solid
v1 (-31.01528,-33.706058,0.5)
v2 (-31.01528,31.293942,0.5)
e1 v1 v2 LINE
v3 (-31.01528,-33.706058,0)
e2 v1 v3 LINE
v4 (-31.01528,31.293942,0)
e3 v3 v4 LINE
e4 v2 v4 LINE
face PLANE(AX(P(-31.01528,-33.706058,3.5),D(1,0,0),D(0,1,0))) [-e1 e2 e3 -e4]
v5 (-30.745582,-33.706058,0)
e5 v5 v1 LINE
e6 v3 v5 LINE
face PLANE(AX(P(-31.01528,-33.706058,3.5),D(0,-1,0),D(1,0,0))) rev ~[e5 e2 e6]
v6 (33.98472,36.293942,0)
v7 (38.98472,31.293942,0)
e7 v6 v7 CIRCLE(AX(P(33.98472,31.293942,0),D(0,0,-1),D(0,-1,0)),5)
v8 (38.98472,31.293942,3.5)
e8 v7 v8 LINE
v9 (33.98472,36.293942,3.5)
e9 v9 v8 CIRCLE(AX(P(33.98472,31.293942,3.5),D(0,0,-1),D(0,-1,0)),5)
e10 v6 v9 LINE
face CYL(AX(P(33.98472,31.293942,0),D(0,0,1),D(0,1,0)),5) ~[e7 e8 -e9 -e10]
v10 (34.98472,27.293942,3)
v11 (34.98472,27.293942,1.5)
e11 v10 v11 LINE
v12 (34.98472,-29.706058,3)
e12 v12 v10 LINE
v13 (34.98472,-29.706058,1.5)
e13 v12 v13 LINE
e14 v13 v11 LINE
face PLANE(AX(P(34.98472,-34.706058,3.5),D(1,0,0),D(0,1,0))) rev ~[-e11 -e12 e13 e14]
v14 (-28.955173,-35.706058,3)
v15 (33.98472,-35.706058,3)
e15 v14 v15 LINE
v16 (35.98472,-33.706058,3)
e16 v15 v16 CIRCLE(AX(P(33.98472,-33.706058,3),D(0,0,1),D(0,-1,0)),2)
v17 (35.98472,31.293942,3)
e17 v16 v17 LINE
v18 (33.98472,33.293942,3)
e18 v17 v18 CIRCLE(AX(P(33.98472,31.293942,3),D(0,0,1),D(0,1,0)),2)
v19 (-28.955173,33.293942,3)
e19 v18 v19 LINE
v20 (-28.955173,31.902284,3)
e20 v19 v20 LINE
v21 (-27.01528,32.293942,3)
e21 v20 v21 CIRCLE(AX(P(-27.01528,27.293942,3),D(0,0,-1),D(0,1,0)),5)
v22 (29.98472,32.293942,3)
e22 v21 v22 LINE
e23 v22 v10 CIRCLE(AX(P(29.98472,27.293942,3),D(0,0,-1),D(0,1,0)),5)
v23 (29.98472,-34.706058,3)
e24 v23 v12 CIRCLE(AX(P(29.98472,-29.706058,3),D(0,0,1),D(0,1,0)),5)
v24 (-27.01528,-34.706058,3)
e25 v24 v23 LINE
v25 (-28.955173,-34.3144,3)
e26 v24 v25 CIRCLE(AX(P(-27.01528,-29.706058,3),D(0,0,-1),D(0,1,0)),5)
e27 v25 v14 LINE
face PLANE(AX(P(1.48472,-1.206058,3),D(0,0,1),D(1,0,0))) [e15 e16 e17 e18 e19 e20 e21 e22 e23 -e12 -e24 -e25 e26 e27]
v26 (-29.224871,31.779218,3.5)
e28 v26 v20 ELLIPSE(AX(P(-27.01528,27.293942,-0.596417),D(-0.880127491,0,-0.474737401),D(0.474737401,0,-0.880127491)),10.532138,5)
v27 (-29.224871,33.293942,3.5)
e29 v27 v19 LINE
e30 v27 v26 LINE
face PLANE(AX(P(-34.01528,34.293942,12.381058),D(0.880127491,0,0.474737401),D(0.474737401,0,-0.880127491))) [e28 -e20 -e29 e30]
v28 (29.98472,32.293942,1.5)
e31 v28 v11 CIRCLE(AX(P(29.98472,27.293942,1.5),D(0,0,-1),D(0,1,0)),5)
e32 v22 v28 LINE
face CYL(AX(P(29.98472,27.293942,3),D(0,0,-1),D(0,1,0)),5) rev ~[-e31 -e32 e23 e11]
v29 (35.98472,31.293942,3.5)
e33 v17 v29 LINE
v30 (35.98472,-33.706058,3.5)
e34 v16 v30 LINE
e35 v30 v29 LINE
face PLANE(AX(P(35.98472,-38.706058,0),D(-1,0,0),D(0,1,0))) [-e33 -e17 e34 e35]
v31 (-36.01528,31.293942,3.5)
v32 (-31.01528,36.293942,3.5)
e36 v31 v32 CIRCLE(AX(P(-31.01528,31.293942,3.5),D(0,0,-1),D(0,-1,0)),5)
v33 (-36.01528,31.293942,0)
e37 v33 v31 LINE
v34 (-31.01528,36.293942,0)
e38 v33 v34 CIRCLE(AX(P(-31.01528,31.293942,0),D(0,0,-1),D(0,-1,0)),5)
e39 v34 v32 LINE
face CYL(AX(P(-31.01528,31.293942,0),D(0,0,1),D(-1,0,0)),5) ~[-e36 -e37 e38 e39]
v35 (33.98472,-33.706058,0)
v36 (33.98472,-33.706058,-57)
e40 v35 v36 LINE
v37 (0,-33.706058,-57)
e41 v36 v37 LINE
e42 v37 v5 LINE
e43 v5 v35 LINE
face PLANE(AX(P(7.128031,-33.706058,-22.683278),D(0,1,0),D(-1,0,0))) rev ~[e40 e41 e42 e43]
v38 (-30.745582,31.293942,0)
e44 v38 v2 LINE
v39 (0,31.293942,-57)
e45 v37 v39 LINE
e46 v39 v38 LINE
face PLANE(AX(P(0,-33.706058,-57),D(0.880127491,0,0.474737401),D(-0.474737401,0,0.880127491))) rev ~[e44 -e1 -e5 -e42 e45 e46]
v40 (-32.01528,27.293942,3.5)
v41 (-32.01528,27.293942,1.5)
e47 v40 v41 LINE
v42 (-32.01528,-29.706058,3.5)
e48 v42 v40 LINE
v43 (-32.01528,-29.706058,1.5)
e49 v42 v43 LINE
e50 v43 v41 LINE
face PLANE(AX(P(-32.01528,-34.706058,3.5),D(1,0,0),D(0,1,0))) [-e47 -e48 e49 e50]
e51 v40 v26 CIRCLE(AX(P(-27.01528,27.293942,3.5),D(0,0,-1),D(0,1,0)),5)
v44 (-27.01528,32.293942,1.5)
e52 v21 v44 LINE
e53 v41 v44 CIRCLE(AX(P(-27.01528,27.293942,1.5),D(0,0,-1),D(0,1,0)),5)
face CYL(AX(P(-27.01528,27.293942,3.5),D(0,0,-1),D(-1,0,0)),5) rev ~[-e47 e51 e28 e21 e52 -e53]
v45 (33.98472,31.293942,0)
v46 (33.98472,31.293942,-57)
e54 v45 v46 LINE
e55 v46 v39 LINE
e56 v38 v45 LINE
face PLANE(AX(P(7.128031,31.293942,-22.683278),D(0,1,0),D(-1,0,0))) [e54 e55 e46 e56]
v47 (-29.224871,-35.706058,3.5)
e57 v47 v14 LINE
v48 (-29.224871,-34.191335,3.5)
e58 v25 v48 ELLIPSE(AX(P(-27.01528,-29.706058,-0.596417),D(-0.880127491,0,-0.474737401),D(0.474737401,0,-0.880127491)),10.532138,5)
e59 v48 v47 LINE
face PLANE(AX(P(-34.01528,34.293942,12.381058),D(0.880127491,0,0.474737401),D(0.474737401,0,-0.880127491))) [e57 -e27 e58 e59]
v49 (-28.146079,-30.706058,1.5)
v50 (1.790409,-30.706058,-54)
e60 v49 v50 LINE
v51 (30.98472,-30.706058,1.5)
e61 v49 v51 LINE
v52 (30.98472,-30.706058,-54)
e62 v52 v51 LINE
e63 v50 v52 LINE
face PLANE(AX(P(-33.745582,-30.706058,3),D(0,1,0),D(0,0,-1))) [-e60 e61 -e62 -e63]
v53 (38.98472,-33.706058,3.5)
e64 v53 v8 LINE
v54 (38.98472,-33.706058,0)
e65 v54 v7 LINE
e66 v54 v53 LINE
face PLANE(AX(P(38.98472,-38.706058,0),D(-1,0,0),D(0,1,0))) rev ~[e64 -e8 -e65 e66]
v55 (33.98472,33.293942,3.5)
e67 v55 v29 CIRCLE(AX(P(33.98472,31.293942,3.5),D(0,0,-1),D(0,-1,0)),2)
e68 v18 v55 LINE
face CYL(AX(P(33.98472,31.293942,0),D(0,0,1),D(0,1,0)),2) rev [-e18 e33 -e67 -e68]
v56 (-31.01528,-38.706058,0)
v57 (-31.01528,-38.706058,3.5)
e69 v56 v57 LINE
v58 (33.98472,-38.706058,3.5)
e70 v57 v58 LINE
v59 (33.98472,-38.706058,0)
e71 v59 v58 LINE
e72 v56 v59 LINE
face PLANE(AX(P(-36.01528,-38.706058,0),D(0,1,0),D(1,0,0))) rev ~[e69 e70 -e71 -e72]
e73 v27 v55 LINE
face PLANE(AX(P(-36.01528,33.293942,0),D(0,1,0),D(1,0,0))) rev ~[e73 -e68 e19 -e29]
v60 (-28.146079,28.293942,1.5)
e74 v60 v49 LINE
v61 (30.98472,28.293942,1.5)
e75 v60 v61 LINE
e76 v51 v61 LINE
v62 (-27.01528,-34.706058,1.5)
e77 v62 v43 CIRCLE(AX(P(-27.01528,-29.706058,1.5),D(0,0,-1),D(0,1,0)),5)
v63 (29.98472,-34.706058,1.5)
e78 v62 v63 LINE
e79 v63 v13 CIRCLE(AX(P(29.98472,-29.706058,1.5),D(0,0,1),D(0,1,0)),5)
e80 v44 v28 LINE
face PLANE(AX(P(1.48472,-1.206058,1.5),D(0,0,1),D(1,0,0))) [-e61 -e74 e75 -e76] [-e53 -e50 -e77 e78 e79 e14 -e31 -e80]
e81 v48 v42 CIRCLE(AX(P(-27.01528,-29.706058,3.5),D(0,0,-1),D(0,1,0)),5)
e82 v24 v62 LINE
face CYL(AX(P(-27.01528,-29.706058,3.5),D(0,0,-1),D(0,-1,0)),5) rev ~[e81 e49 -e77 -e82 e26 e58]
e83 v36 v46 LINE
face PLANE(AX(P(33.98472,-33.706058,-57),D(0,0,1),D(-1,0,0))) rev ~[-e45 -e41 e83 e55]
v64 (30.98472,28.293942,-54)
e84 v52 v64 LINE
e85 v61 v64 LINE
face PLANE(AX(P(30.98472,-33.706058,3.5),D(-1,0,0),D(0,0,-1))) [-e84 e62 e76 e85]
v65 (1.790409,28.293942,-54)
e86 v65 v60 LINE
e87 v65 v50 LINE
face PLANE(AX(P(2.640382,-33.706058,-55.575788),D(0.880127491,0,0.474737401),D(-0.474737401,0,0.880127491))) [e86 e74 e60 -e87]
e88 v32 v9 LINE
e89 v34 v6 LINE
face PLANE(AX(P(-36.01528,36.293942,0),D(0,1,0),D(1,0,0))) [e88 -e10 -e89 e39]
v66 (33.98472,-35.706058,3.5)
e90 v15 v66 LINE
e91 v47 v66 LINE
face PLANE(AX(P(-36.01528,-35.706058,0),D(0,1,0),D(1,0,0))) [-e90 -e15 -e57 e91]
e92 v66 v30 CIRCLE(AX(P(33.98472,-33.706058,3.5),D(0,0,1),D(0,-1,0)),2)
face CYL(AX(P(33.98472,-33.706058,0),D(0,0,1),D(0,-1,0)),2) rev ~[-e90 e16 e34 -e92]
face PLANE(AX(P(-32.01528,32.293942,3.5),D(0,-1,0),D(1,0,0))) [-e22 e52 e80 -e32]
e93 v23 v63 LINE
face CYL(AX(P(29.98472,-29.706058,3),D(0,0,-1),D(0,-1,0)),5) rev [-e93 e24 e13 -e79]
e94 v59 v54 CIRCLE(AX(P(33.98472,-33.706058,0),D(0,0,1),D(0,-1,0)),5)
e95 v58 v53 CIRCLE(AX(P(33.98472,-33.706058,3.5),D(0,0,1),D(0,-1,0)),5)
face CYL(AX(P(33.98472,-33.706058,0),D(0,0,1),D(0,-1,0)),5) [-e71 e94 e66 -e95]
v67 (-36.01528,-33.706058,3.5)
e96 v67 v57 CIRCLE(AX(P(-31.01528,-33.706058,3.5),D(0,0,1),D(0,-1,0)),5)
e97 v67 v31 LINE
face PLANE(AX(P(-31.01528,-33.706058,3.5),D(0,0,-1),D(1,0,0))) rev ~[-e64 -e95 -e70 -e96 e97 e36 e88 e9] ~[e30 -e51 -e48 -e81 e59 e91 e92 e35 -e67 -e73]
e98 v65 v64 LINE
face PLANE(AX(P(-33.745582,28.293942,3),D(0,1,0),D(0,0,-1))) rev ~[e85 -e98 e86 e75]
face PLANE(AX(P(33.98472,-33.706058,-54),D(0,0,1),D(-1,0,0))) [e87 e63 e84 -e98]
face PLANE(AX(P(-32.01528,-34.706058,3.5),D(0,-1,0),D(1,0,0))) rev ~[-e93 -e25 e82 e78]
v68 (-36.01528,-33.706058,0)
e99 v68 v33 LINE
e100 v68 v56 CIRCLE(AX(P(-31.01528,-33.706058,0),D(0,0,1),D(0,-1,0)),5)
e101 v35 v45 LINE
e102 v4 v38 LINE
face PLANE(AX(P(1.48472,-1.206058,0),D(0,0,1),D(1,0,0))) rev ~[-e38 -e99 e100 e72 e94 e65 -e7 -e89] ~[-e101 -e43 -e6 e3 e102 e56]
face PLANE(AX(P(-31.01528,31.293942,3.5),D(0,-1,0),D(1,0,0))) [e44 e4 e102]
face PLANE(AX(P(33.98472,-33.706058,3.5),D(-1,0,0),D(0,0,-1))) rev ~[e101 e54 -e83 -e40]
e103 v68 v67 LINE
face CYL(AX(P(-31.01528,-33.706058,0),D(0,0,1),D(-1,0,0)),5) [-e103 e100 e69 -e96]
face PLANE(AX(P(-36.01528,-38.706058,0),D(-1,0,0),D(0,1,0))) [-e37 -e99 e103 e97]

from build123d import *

# Parameters (mm, degrees)
F0_W        = 75
F0_H        = 75
F1_DEPTH    = 3.5
F2_W        = 65
F2_H        = 65
F3_DEPTH    = 3.5
F4_R        = 5
F6_DEPTH    = 65
F7_T        = 3
F7_T3_DEPTH = 70.7303019134
F7_T5_DEPTH = 71
F7_T7_DEPTH = 6.5680995141
F7_T9_DEPTH = 6.5
F8_W        = 67
F8_H        = 67
F9_DEPTH    = 2
F10_R       = 5


# Not quite as in the source:
# - a shell that OpenCascade refuses in one call is made with other operations: the cavity is built on its own and cut out


with BuildPart() as f1:
    # F0 (on Top) → F1 (new body)
    with BuildSketch(Plane.XY):
        with Locations((1.4847200364, -1.2060580678)):
            Rectangle(F0_W, F0_H)
    extrude(amount=F1_DEPTH)

    # F2 (on face) → F3 (cut)
    with BuildSketch(Plane.XY.offset(3.5)):
        with Locations((1.4847200364, -1.2060580678)):
            Rectangle(F2_W, F2_H)
    extrude(amount=-F3_DEPTH, mode=Mode.SUBTRACT)

    # F4
    f4_edges = [f1.edges().sort_by_distance(p)[0] for p in [
        (38.98472, -38.706058, 1.75),
        (-36.01528, -38.706058, 1.75),
        (38.98472, 36.293942, 1.75),
        (-36.01528, 36.293942, 1.75),
    ]]
    fillet(f4_edges, radius=F4_R)

    # F5 (on face) → F6 (join)
    with BuildSketch(Plane(origin=(0, -33.7060580678, 0), x_dir=(-1, 0, 0), z_dir=(0, 1, 0))):
        Polygon((31.0152799636, 3.5), (-33.9847200364, 3.5), (-33.9847200364, -57), (0, -57), (31.0152799636, 0.5), align=None)
    extrude(amount=F6_DEPTH)

    # F7: shell of thickness 3, made by hand


with BuildPart() as f7_core1:
    # F7_t2: copy of F1
    add(f1.part)

    # the walls: a layer under each face that stays
    f7_faces = [f7_core1.faces().sort_by_distance(p)[0] for p in [
        (1.4847200364, 36.2939419322, 1.75),
        (-33.5152799636, -36.2060580678, 0),
        (37.5202539423, 34.8294758382, 1.75),
        (-34.5508138695, 34.8294758382, 1.75),
        (38.9847200364, -1.2060580678, 1.75),
        (-36.0152799636, -1.2060580678, 1.75),
        (37.5202539423, -37.2415919737, 1.75),
        (-34.5508138695, -37.2415919737, 1.75),
        (1.4847200364, -38.7060580678, 1.75),
        (-30.9703302825, -33.7060580678, 0.0833333333),
        (1.6195690797, -33.7060580678, -28.5),
        (33.9847200364, -1.2060580678, -28.5),
        (1.6195690797, 31.2939419322, -28.5),
        (-30.8804309203, 31.2939419322, 0.0833333333),
        (-31.0152799636, -1.2060580678, 0.25),
        (-15.5076399818, -1.2060580678, -28.25),
        (16.9923600182, -1.2060580678, -57),
    ]]
    thicken(f7_faces, amount=-F7_T, mode=Mode.SUBTRACT)

    # F7_s4 → F7_t3 (cut)
    with BuildSketch(Plane.YZ.offset(-33.745581877)):
        Polygon((-33.7360580678, -0.03), (-33.7060580678, 3), (-30.7060580678, 3), (-30.7060580678, 0), align=None)
        Polygon((31.3239419322, -0.03), (31.2939419322, 3), (28.2939419322, 3), (28.2939419322, 0), align=None)
    extrude(amount=F7_T3_DEPTH, mode=Mode.SUBTRACT)

    # F7_s6 → F7_t5 (cut)
    with BuildSketch(Plane.XZ.offset(-34.2939419322)):
        Polygon((34.0147200364, -0.03), (33.9847200364, 3), (30.9847200364, 3), (30.9847200364, 0), align=None)
        Polygon((-31.0116837883, 0.485757878), (-34.0152799636, 0.5), (-34.0152799636, 12.3810577497), (-28.3748974906, 1.9242122019), align=None)
    extrude(amount=F7_T5_DEPTH, mode=Mode.SUBTRACT)

    # F7_s8 → F7_t7 (cut)
    with BuildSketch(Plane(origin=(-5.5050917478, 0, 10.2060267027), x_dir=(0, 1, 0), z_dir=(-0.4747374006, 0, 0.880127491))):
        Polygon((-33.6760580678, 27.0900318369), (-36.7060580678, 27.0600318369), (-36.7060580678, 24.0600318369), (-33.7060580678, 24.0600318369), align=None)
        Polygon((31.2639419322, 27.0900318369), (34.2939419322, 27.0600318369), (34.2939419322, 24.0600318369), (31.2939419322, 24.0600318369), align=None)
    extrude(amount=F7_T7_DEPTH, mode=Mode.SUBTRACT)

    # F7_s10 → F7_t9 (cut)
    with BuildSketch(Plane.XY.offset(-3)):
        Polygon((-30.9852799636, -33.6760580678), (-31.0152799636, -36.7060580678), (-34.0152799636, -36.7060580678), (-34.0152799636, -33.7060580678), align=None)
        Polygon((-30.9852799636, 31.2639419322), (-31.0152799636, 34.2939419322), (-34.0152799636, 34.2939419322), (-34.0152799636, 31.2939419322), align=None)
    extrude(amount=F7_T9_DEPTH, mode=Mode.SUBTRACT)


with BuildPart() as f1_1:
    add(f1.part)

    # what is left inside the walls is the cavity
    f7_cavity = [f7_core1.part.solids().sort_by_distance(p)[0] for p in [
        (3.379924, -12.706058, 3.47),
    ]]
    add(f7_cavity, mode=Mode.SUBTRACT)

    # F8 (on face) → F9 (cut)
    with BuildSketch(Plane.XY.offset(3.5)):
        with Locations((1.4847200364, -1.2060580678)):
            Rectangle(F8_W, F8_H)
    extrude(amount=-F9_DEPTH, mode=Mode.SUBTRACT)

    # F10
    f10_edges = [f1_1.edges().sort_by_distance(p)[0] for p in [
        (-32.01528, 32.293942, 2.5),
        (34.98472, 32.293942, 2.25),
        (-32.01528, -34.706058, 2.5),
        (34.98472, -34.706058, 2.25),
    ]]
    fillet(f10_edges, radius=F10_R)


solid = f1_1.part
